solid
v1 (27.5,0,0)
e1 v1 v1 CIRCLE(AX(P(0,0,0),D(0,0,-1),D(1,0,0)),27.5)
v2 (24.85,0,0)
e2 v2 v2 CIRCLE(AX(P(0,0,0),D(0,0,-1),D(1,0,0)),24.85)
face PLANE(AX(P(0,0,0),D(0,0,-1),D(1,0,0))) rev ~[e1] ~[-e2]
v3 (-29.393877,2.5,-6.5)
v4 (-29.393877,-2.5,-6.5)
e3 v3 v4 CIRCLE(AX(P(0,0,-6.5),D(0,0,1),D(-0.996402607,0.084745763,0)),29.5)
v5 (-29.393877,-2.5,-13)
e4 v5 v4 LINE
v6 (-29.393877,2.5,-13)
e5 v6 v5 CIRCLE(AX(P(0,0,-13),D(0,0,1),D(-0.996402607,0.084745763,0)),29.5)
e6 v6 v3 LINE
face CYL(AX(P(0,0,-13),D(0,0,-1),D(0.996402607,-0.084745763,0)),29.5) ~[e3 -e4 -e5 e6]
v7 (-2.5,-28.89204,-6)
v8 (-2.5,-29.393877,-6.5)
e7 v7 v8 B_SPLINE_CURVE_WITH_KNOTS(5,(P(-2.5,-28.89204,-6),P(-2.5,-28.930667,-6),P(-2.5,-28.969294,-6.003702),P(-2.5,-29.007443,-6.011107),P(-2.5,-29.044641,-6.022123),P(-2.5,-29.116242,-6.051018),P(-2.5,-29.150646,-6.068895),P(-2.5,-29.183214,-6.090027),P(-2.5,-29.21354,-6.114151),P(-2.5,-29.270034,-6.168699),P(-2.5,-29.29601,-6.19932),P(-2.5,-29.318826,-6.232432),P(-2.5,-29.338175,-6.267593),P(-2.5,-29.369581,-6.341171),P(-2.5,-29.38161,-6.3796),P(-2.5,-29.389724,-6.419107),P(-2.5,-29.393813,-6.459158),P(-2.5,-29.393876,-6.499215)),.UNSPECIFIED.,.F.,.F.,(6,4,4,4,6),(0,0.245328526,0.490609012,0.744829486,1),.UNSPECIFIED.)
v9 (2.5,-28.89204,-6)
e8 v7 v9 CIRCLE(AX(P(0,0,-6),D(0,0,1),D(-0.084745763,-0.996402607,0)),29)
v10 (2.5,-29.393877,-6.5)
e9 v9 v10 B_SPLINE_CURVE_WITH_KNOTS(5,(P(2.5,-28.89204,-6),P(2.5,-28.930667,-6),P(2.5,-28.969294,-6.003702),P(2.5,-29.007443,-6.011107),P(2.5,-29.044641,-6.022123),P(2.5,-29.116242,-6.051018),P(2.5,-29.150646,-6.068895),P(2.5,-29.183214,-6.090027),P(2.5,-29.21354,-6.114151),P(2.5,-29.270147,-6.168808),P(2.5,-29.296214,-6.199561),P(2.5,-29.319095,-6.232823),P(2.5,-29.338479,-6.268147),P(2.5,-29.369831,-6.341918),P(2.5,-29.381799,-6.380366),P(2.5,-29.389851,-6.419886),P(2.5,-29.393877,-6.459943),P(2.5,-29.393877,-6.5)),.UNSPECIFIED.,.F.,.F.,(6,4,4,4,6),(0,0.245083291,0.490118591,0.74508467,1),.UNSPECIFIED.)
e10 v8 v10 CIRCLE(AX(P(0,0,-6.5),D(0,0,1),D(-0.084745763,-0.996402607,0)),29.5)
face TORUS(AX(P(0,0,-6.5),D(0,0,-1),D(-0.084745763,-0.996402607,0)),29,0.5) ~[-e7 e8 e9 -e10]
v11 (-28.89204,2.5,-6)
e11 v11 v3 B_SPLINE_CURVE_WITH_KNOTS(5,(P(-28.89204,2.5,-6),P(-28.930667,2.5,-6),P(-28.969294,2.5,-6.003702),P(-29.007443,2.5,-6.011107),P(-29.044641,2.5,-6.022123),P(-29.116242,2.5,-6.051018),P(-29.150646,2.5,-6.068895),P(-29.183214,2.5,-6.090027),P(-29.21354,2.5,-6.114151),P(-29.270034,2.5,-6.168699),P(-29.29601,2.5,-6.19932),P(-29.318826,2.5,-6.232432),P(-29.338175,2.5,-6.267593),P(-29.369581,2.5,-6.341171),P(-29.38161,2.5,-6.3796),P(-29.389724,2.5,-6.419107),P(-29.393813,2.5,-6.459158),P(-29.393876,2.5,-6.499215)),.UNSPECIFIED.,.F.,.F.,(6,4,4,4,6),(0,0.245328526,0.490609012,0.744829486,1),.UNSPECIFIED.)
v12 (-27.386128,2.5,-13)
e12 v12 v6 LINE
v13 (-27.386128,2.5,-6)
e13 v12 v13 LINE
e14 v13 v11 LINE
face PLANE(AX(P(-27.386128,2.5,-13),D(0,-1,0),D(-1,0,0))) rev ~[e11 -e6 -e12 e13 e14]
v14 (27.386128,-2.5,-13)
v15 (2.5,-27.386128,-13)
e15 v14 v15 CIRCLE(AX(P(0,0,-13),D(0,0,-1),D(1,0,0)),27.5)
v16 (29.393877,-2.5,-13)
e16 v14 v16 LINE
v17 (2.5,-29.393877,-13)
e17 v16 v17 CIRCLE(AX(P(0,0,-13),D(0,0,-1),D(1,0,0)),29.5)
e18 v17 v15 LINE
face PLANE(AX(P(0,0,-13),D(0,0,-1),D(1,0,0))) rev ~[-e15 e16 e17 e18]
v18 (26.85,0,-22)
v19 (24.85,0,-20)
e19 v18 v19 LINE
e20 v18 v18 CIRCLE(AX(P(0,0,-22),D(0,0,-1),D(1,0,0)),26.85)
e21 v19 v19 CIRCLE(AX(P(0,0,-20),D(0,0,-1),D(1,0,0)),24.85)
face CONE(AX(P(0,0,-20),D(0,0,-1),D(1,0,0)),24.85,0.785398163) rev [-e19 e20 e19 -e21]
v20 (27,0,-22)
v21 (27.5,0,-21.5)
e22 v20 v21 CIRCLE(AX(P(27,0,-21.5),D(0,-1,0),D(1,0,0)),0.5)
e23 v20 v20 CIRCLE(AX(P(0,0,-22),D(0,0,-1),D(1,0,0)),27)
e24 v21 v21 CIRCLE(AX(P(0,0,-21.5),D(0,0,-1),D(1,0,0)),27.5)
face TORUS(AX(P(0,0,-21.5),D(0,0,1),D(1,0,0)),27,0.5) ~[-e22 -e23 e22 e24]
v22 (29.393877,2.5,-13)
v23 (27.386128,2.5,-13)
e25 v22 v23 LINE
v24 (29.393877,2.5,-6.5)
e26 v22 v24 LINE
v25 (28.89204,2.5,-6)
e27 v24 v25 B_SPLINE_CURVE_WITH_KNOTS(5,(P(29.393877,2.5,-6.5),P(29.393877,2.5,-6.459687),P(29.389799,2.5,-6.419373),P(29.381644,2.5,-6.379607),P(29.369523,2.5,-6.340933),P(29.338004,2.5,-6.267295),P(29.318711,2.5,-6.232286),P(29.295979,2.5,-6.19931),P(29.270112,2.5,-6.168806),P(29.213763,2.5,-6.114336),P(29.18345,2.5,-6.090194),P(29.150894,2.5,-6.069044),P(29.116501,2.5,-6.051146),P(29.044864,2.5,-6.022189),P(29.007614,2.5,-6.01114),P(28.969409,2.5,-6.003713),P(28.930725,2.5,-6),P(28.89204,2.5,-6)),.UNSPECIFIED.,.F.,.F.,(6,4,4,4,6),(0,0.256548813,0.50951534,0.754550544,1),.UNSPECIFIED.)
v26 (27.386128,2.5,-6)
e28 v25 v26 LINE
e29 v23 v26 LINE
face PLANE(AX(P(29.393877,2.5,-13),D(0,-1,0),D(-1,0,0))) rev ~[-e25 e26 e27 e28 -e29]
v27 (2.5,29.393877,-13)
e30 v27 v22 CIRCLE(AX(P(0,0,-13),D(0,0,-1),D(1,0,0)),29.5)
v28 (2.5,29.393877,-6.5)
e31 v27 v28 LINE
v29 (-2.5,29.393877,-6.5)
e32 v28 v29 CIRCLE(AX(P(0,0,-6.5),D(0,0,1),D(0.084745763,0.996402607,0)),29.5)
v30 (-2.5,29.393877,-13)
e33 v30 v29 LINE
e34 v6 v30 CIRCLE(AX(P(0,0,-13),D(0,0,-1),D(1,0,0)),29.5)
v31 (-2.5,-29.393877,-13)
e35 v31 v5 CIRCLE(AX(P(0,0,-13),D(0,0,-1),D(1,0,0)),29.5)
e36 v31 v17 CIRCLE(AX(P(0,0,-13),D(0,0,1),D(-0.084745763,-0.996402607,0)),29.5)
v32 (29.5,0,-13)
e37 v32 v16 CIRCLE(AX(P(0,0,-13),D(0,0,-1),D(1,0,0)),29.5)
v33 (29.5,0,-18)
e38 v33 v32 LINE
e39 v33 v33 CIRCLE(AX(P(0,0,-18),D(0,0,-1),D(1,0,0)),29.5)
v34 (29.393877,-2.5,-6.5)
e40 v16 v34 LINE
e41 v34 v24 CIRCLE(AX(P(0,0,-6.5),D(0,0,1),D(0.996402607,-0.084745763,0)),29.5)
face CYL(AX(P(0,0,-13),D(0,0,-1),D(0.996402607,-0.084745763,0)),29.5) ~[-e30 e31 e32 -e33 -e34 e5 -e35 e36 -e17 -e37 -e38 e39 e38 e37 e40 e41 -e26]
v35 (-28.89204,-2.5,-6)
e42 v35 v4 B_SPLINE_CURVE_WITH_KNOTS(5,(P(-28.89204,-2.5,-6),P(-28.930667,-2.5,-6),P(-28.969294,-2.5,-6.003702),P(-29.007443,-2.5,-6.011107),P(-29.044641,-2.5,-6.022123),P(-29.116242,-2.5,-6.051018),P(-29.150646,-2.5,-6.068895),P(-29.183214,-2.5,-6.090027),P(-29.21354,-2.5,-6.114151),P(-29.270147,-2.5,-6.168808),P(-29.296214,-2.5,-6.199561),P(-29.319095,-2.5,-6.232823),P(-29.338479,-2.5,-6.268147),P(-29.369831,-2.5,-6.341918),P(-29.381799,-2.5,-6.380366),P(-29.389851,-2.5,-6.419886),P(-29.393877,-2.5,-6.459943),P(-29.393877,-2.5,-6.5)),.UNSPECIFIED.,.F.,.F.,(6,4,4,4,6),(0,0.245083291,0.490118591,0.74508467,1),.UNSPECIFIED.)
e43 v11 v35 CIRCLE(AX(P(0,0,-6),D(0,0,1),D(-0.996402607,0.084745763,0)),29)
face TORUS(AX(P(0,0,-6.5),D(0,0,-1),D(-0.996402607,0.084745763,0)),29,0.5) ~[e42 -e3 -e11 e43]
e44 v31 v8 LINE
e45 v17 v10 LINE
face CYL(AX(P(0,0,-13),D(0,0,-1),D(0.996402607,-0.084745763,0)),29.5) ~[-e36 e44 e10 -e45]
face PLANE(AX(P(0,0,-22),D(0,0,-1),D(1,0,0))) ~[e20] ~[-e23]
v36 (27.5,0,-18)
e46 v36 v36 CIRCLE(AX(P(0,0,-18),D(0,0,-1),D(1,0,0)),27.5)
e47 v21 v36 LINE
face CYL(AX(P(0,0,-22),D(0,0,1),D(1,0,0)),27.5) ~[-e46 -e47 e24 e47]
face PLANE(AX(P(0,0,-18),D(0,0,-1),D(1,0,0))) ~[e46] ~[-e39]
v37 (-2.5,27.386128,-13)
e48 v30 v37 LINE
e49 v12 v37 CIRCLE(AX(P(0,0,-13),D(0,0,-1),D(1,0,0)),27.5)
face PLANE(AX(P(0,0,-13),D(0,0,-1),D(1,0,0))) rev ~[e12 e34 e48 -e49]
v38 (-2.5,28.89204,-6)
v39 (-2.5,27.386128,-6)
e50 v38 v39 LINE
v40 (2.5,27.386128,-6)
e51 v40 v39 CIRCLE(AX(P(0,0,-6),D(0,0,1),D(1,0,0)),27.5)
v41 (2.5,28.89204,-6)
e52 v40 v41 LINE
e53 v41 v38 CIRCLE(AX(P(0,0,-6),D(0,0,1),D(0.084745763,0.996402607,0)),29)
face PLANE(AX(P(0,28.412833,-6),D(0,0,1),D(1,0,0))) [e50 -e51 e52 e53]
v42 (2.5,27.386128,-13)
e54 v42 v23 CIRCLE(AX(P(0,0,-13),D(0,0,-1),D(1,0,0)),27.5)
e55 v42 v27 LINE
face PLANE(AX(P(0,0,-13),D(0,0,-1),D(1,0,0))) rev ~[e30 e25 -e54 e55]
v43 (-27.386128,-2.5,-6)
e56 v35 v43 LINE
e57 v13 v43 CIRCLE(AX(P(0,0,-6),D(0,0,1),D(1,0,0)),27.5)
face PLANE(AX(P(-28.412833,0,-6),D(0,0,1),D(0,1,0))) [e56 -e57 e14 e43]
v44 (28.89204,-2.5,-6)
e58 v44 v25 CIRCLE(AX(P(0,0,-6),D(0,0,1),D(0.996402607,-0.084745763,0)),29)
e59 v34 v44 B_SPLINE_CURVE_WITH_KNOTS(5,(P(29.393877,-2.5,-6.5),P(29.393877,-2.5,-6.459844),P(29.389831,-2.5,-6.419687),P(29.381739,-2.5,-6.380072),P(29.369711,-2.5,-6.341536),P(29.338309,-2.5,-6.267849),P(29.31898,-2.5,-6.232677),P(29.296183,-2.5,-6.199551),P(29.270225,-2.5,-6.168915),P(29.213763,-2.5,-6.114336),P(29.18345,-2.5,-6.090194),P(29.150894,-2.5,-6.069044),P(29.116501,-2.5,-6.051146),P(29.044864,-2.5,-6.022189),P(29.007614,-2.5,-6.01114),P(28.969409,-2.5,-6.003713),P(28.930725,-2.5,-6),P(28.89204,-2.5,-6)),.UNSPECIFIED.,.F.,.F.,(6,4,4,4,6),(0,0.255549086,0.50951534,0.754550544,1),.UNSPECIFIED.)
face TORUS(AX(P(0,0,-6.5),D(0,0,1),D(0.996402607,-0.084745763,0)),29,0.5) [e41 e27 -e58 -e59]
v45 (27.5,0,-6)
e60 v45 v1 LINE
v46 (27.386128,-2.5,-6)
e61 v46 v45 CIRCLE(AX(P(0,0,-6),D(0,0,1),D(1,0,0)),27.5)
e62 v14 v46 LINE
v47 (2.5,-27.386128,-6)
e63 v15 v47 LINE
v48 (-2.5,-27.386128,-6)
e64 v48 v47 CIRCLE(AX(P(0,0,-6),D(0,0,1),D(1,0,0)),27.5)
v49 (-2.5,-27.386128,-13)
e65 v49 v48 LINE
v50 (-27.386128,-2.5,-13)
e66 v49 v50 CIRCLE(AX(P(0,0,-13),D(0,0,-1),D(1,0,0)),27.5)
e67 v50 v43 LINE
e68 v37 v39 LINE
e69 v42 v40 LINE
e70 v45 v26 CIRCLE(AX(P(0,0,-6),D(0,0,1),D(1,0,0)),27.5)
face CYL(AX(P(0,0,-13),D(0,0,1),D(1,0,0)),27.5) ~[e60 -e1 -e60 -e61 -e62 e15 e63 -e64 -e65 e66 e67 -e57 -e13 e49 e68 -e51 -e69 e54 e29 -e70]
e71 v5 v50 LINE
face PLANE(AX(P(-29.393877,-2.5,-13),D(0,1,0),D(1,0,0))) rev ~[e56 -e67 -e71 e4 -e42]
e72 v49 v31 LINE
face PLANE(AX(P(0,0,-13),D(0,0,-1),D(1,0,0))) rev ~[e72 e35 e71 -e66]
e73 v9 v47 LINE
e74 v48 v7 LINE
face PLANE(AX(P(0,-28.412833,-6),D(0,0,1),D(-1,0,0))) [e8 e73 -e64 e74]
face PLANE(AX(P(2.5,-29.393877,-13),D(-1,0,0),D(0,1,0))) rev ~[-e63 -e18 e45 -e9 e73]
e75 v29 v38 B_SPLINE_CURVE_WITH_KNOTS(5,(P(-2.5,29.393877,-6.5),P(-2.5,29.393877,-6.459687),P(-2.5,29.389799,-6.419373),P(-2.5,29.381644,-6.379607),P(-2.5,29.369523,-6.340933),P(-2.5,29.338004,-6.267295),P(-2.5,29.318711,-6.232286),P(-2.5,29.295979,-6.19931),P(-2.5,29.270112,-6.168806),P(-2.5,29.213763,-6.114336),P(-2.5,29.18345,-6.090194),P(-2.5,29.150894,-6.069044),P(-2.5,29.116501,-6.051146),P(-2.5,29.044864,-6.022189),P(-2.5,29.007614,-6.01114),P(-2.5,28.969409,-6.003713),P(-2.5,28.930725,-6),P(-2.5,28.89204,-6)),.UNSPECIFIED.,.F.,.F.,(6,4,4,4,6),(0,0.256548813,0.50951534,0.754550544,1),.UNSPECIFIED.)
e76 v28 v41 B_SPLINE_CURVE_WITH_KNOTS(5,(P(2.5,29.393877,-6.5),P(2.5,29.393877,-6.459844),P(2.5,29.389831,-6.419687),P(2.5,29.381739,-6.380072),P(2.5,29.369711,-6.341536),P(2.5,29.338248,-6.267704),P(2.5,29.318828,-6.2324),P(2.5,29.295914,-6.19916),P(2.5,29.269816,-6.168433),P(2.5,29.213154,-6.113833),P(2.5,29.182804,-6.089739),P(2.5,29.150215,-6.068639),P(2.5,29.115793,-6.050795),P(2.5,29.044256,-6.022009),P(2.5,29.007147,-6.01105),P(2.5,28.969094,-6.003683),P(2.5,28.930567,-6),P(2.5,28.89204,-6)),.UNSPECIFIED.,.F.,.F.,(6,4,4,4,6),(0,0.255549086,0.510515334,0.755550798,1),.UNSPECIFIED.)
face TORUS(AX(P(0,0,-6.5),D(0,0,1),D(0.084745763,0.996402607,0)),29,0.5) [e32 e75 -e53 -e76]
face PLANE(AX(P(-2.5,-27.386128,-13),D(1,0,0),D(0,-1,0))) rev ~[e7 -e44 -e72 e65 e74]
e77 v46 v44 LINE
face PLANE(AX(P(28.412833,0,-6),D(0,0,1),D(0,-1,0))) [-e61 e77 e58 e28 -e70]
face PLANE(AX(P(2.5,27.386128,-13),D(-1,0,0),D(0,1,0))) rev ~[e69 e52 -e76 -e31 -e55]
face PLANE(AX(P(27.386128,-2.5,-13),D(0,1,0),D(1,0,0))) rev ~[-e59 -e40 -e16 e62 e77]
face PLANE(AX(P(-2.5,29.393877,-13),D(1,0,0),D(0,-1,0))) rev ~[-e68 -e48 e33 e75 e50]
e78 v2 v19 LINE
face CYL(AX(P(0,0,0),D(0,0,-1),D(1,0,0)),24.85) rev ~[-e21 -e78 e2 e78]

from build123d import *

# Parameters (mm, degrees)
F2_R            = 0.5
F3_SIZE         = 2
F5_DEPTH        = 7
F5_COPIES_COUNT = 4
F6_R            = 0.5


# Not quite as in the source:
# - after a boolean that leaves OpenCascade's solid faulty, fix() repairs it
# - a pattern or mirror of a feature is missing from the dataset's text; its kind, count and spacing are read off the source's solid


with BuildPart() as f1:
    # F0 (on Front) → F1 (revolve)
    with BuildSketch(Plane.XZ):
        Polygon((27.5, 0), (24.85, 0), (24.85, -22), (27.5, -22), (27.5, -18), (29.5, -18), (29.5, -13), (27.5, -13), align=None)
    revolve(axis=Axis((0, 0, -6.1865765601), (0, 0, -1)))

    # F2
    f2_edges = [f1.edges().sort_by_distance(p)[0] for p in [
        (-27.5, 0, -22),
    ]]
    fillet(f2_edges, radius=F2_R)

    # F3
    f3_edges = [f1.edges().sort_by_distance(p)[0] for p in [
        (-24.85, 0, -22),
    ]]
    chamfer(f3_edges, length=F3_SIZE)

    # F4 (on face) → F5 (join)
    with BuildSketch(Plane.XY.offset(-13)):
        with BuildLine():
            Line((-2.5, 29.3938769134), (-2.5, 27.3861278753))
            Line((-2.5, 27.3861278753), (2.5, 27.3861278753))
            Line((2.5, 27.3861278753), (2.5, 29.3938769134))
            ThreePointArc((2.5, 29.3938769134), (0, 29.5), (-2.5, 29.3938769134))
        make_face()
    f5 = extrude(amount=F5_DEPTH)

    # F5_copies: F5 ×4 about axis
    f5_copies_axis = Axis((0, 0, 0), (0, 0, 1))
    for i in range(1, F5_COPIES_COUNT):
        add(f5.rotate(f5_copies_axis, i * 360 / F5_COPIES_COUNT))

    add(f1.part.fix(), mode=Mode.REPLACE)

    # F6
    f6_edges = [f1.edges().sort_by_distance(p)[0] for p in [
        (0, 29.5, -6),
        (-29.5, 0, -6),
        (0, -29.5, -6),
        (29.5, 0, -6),
    ]]
    fillet(f6_edges, radius=F6_R)


solid = f1.part
